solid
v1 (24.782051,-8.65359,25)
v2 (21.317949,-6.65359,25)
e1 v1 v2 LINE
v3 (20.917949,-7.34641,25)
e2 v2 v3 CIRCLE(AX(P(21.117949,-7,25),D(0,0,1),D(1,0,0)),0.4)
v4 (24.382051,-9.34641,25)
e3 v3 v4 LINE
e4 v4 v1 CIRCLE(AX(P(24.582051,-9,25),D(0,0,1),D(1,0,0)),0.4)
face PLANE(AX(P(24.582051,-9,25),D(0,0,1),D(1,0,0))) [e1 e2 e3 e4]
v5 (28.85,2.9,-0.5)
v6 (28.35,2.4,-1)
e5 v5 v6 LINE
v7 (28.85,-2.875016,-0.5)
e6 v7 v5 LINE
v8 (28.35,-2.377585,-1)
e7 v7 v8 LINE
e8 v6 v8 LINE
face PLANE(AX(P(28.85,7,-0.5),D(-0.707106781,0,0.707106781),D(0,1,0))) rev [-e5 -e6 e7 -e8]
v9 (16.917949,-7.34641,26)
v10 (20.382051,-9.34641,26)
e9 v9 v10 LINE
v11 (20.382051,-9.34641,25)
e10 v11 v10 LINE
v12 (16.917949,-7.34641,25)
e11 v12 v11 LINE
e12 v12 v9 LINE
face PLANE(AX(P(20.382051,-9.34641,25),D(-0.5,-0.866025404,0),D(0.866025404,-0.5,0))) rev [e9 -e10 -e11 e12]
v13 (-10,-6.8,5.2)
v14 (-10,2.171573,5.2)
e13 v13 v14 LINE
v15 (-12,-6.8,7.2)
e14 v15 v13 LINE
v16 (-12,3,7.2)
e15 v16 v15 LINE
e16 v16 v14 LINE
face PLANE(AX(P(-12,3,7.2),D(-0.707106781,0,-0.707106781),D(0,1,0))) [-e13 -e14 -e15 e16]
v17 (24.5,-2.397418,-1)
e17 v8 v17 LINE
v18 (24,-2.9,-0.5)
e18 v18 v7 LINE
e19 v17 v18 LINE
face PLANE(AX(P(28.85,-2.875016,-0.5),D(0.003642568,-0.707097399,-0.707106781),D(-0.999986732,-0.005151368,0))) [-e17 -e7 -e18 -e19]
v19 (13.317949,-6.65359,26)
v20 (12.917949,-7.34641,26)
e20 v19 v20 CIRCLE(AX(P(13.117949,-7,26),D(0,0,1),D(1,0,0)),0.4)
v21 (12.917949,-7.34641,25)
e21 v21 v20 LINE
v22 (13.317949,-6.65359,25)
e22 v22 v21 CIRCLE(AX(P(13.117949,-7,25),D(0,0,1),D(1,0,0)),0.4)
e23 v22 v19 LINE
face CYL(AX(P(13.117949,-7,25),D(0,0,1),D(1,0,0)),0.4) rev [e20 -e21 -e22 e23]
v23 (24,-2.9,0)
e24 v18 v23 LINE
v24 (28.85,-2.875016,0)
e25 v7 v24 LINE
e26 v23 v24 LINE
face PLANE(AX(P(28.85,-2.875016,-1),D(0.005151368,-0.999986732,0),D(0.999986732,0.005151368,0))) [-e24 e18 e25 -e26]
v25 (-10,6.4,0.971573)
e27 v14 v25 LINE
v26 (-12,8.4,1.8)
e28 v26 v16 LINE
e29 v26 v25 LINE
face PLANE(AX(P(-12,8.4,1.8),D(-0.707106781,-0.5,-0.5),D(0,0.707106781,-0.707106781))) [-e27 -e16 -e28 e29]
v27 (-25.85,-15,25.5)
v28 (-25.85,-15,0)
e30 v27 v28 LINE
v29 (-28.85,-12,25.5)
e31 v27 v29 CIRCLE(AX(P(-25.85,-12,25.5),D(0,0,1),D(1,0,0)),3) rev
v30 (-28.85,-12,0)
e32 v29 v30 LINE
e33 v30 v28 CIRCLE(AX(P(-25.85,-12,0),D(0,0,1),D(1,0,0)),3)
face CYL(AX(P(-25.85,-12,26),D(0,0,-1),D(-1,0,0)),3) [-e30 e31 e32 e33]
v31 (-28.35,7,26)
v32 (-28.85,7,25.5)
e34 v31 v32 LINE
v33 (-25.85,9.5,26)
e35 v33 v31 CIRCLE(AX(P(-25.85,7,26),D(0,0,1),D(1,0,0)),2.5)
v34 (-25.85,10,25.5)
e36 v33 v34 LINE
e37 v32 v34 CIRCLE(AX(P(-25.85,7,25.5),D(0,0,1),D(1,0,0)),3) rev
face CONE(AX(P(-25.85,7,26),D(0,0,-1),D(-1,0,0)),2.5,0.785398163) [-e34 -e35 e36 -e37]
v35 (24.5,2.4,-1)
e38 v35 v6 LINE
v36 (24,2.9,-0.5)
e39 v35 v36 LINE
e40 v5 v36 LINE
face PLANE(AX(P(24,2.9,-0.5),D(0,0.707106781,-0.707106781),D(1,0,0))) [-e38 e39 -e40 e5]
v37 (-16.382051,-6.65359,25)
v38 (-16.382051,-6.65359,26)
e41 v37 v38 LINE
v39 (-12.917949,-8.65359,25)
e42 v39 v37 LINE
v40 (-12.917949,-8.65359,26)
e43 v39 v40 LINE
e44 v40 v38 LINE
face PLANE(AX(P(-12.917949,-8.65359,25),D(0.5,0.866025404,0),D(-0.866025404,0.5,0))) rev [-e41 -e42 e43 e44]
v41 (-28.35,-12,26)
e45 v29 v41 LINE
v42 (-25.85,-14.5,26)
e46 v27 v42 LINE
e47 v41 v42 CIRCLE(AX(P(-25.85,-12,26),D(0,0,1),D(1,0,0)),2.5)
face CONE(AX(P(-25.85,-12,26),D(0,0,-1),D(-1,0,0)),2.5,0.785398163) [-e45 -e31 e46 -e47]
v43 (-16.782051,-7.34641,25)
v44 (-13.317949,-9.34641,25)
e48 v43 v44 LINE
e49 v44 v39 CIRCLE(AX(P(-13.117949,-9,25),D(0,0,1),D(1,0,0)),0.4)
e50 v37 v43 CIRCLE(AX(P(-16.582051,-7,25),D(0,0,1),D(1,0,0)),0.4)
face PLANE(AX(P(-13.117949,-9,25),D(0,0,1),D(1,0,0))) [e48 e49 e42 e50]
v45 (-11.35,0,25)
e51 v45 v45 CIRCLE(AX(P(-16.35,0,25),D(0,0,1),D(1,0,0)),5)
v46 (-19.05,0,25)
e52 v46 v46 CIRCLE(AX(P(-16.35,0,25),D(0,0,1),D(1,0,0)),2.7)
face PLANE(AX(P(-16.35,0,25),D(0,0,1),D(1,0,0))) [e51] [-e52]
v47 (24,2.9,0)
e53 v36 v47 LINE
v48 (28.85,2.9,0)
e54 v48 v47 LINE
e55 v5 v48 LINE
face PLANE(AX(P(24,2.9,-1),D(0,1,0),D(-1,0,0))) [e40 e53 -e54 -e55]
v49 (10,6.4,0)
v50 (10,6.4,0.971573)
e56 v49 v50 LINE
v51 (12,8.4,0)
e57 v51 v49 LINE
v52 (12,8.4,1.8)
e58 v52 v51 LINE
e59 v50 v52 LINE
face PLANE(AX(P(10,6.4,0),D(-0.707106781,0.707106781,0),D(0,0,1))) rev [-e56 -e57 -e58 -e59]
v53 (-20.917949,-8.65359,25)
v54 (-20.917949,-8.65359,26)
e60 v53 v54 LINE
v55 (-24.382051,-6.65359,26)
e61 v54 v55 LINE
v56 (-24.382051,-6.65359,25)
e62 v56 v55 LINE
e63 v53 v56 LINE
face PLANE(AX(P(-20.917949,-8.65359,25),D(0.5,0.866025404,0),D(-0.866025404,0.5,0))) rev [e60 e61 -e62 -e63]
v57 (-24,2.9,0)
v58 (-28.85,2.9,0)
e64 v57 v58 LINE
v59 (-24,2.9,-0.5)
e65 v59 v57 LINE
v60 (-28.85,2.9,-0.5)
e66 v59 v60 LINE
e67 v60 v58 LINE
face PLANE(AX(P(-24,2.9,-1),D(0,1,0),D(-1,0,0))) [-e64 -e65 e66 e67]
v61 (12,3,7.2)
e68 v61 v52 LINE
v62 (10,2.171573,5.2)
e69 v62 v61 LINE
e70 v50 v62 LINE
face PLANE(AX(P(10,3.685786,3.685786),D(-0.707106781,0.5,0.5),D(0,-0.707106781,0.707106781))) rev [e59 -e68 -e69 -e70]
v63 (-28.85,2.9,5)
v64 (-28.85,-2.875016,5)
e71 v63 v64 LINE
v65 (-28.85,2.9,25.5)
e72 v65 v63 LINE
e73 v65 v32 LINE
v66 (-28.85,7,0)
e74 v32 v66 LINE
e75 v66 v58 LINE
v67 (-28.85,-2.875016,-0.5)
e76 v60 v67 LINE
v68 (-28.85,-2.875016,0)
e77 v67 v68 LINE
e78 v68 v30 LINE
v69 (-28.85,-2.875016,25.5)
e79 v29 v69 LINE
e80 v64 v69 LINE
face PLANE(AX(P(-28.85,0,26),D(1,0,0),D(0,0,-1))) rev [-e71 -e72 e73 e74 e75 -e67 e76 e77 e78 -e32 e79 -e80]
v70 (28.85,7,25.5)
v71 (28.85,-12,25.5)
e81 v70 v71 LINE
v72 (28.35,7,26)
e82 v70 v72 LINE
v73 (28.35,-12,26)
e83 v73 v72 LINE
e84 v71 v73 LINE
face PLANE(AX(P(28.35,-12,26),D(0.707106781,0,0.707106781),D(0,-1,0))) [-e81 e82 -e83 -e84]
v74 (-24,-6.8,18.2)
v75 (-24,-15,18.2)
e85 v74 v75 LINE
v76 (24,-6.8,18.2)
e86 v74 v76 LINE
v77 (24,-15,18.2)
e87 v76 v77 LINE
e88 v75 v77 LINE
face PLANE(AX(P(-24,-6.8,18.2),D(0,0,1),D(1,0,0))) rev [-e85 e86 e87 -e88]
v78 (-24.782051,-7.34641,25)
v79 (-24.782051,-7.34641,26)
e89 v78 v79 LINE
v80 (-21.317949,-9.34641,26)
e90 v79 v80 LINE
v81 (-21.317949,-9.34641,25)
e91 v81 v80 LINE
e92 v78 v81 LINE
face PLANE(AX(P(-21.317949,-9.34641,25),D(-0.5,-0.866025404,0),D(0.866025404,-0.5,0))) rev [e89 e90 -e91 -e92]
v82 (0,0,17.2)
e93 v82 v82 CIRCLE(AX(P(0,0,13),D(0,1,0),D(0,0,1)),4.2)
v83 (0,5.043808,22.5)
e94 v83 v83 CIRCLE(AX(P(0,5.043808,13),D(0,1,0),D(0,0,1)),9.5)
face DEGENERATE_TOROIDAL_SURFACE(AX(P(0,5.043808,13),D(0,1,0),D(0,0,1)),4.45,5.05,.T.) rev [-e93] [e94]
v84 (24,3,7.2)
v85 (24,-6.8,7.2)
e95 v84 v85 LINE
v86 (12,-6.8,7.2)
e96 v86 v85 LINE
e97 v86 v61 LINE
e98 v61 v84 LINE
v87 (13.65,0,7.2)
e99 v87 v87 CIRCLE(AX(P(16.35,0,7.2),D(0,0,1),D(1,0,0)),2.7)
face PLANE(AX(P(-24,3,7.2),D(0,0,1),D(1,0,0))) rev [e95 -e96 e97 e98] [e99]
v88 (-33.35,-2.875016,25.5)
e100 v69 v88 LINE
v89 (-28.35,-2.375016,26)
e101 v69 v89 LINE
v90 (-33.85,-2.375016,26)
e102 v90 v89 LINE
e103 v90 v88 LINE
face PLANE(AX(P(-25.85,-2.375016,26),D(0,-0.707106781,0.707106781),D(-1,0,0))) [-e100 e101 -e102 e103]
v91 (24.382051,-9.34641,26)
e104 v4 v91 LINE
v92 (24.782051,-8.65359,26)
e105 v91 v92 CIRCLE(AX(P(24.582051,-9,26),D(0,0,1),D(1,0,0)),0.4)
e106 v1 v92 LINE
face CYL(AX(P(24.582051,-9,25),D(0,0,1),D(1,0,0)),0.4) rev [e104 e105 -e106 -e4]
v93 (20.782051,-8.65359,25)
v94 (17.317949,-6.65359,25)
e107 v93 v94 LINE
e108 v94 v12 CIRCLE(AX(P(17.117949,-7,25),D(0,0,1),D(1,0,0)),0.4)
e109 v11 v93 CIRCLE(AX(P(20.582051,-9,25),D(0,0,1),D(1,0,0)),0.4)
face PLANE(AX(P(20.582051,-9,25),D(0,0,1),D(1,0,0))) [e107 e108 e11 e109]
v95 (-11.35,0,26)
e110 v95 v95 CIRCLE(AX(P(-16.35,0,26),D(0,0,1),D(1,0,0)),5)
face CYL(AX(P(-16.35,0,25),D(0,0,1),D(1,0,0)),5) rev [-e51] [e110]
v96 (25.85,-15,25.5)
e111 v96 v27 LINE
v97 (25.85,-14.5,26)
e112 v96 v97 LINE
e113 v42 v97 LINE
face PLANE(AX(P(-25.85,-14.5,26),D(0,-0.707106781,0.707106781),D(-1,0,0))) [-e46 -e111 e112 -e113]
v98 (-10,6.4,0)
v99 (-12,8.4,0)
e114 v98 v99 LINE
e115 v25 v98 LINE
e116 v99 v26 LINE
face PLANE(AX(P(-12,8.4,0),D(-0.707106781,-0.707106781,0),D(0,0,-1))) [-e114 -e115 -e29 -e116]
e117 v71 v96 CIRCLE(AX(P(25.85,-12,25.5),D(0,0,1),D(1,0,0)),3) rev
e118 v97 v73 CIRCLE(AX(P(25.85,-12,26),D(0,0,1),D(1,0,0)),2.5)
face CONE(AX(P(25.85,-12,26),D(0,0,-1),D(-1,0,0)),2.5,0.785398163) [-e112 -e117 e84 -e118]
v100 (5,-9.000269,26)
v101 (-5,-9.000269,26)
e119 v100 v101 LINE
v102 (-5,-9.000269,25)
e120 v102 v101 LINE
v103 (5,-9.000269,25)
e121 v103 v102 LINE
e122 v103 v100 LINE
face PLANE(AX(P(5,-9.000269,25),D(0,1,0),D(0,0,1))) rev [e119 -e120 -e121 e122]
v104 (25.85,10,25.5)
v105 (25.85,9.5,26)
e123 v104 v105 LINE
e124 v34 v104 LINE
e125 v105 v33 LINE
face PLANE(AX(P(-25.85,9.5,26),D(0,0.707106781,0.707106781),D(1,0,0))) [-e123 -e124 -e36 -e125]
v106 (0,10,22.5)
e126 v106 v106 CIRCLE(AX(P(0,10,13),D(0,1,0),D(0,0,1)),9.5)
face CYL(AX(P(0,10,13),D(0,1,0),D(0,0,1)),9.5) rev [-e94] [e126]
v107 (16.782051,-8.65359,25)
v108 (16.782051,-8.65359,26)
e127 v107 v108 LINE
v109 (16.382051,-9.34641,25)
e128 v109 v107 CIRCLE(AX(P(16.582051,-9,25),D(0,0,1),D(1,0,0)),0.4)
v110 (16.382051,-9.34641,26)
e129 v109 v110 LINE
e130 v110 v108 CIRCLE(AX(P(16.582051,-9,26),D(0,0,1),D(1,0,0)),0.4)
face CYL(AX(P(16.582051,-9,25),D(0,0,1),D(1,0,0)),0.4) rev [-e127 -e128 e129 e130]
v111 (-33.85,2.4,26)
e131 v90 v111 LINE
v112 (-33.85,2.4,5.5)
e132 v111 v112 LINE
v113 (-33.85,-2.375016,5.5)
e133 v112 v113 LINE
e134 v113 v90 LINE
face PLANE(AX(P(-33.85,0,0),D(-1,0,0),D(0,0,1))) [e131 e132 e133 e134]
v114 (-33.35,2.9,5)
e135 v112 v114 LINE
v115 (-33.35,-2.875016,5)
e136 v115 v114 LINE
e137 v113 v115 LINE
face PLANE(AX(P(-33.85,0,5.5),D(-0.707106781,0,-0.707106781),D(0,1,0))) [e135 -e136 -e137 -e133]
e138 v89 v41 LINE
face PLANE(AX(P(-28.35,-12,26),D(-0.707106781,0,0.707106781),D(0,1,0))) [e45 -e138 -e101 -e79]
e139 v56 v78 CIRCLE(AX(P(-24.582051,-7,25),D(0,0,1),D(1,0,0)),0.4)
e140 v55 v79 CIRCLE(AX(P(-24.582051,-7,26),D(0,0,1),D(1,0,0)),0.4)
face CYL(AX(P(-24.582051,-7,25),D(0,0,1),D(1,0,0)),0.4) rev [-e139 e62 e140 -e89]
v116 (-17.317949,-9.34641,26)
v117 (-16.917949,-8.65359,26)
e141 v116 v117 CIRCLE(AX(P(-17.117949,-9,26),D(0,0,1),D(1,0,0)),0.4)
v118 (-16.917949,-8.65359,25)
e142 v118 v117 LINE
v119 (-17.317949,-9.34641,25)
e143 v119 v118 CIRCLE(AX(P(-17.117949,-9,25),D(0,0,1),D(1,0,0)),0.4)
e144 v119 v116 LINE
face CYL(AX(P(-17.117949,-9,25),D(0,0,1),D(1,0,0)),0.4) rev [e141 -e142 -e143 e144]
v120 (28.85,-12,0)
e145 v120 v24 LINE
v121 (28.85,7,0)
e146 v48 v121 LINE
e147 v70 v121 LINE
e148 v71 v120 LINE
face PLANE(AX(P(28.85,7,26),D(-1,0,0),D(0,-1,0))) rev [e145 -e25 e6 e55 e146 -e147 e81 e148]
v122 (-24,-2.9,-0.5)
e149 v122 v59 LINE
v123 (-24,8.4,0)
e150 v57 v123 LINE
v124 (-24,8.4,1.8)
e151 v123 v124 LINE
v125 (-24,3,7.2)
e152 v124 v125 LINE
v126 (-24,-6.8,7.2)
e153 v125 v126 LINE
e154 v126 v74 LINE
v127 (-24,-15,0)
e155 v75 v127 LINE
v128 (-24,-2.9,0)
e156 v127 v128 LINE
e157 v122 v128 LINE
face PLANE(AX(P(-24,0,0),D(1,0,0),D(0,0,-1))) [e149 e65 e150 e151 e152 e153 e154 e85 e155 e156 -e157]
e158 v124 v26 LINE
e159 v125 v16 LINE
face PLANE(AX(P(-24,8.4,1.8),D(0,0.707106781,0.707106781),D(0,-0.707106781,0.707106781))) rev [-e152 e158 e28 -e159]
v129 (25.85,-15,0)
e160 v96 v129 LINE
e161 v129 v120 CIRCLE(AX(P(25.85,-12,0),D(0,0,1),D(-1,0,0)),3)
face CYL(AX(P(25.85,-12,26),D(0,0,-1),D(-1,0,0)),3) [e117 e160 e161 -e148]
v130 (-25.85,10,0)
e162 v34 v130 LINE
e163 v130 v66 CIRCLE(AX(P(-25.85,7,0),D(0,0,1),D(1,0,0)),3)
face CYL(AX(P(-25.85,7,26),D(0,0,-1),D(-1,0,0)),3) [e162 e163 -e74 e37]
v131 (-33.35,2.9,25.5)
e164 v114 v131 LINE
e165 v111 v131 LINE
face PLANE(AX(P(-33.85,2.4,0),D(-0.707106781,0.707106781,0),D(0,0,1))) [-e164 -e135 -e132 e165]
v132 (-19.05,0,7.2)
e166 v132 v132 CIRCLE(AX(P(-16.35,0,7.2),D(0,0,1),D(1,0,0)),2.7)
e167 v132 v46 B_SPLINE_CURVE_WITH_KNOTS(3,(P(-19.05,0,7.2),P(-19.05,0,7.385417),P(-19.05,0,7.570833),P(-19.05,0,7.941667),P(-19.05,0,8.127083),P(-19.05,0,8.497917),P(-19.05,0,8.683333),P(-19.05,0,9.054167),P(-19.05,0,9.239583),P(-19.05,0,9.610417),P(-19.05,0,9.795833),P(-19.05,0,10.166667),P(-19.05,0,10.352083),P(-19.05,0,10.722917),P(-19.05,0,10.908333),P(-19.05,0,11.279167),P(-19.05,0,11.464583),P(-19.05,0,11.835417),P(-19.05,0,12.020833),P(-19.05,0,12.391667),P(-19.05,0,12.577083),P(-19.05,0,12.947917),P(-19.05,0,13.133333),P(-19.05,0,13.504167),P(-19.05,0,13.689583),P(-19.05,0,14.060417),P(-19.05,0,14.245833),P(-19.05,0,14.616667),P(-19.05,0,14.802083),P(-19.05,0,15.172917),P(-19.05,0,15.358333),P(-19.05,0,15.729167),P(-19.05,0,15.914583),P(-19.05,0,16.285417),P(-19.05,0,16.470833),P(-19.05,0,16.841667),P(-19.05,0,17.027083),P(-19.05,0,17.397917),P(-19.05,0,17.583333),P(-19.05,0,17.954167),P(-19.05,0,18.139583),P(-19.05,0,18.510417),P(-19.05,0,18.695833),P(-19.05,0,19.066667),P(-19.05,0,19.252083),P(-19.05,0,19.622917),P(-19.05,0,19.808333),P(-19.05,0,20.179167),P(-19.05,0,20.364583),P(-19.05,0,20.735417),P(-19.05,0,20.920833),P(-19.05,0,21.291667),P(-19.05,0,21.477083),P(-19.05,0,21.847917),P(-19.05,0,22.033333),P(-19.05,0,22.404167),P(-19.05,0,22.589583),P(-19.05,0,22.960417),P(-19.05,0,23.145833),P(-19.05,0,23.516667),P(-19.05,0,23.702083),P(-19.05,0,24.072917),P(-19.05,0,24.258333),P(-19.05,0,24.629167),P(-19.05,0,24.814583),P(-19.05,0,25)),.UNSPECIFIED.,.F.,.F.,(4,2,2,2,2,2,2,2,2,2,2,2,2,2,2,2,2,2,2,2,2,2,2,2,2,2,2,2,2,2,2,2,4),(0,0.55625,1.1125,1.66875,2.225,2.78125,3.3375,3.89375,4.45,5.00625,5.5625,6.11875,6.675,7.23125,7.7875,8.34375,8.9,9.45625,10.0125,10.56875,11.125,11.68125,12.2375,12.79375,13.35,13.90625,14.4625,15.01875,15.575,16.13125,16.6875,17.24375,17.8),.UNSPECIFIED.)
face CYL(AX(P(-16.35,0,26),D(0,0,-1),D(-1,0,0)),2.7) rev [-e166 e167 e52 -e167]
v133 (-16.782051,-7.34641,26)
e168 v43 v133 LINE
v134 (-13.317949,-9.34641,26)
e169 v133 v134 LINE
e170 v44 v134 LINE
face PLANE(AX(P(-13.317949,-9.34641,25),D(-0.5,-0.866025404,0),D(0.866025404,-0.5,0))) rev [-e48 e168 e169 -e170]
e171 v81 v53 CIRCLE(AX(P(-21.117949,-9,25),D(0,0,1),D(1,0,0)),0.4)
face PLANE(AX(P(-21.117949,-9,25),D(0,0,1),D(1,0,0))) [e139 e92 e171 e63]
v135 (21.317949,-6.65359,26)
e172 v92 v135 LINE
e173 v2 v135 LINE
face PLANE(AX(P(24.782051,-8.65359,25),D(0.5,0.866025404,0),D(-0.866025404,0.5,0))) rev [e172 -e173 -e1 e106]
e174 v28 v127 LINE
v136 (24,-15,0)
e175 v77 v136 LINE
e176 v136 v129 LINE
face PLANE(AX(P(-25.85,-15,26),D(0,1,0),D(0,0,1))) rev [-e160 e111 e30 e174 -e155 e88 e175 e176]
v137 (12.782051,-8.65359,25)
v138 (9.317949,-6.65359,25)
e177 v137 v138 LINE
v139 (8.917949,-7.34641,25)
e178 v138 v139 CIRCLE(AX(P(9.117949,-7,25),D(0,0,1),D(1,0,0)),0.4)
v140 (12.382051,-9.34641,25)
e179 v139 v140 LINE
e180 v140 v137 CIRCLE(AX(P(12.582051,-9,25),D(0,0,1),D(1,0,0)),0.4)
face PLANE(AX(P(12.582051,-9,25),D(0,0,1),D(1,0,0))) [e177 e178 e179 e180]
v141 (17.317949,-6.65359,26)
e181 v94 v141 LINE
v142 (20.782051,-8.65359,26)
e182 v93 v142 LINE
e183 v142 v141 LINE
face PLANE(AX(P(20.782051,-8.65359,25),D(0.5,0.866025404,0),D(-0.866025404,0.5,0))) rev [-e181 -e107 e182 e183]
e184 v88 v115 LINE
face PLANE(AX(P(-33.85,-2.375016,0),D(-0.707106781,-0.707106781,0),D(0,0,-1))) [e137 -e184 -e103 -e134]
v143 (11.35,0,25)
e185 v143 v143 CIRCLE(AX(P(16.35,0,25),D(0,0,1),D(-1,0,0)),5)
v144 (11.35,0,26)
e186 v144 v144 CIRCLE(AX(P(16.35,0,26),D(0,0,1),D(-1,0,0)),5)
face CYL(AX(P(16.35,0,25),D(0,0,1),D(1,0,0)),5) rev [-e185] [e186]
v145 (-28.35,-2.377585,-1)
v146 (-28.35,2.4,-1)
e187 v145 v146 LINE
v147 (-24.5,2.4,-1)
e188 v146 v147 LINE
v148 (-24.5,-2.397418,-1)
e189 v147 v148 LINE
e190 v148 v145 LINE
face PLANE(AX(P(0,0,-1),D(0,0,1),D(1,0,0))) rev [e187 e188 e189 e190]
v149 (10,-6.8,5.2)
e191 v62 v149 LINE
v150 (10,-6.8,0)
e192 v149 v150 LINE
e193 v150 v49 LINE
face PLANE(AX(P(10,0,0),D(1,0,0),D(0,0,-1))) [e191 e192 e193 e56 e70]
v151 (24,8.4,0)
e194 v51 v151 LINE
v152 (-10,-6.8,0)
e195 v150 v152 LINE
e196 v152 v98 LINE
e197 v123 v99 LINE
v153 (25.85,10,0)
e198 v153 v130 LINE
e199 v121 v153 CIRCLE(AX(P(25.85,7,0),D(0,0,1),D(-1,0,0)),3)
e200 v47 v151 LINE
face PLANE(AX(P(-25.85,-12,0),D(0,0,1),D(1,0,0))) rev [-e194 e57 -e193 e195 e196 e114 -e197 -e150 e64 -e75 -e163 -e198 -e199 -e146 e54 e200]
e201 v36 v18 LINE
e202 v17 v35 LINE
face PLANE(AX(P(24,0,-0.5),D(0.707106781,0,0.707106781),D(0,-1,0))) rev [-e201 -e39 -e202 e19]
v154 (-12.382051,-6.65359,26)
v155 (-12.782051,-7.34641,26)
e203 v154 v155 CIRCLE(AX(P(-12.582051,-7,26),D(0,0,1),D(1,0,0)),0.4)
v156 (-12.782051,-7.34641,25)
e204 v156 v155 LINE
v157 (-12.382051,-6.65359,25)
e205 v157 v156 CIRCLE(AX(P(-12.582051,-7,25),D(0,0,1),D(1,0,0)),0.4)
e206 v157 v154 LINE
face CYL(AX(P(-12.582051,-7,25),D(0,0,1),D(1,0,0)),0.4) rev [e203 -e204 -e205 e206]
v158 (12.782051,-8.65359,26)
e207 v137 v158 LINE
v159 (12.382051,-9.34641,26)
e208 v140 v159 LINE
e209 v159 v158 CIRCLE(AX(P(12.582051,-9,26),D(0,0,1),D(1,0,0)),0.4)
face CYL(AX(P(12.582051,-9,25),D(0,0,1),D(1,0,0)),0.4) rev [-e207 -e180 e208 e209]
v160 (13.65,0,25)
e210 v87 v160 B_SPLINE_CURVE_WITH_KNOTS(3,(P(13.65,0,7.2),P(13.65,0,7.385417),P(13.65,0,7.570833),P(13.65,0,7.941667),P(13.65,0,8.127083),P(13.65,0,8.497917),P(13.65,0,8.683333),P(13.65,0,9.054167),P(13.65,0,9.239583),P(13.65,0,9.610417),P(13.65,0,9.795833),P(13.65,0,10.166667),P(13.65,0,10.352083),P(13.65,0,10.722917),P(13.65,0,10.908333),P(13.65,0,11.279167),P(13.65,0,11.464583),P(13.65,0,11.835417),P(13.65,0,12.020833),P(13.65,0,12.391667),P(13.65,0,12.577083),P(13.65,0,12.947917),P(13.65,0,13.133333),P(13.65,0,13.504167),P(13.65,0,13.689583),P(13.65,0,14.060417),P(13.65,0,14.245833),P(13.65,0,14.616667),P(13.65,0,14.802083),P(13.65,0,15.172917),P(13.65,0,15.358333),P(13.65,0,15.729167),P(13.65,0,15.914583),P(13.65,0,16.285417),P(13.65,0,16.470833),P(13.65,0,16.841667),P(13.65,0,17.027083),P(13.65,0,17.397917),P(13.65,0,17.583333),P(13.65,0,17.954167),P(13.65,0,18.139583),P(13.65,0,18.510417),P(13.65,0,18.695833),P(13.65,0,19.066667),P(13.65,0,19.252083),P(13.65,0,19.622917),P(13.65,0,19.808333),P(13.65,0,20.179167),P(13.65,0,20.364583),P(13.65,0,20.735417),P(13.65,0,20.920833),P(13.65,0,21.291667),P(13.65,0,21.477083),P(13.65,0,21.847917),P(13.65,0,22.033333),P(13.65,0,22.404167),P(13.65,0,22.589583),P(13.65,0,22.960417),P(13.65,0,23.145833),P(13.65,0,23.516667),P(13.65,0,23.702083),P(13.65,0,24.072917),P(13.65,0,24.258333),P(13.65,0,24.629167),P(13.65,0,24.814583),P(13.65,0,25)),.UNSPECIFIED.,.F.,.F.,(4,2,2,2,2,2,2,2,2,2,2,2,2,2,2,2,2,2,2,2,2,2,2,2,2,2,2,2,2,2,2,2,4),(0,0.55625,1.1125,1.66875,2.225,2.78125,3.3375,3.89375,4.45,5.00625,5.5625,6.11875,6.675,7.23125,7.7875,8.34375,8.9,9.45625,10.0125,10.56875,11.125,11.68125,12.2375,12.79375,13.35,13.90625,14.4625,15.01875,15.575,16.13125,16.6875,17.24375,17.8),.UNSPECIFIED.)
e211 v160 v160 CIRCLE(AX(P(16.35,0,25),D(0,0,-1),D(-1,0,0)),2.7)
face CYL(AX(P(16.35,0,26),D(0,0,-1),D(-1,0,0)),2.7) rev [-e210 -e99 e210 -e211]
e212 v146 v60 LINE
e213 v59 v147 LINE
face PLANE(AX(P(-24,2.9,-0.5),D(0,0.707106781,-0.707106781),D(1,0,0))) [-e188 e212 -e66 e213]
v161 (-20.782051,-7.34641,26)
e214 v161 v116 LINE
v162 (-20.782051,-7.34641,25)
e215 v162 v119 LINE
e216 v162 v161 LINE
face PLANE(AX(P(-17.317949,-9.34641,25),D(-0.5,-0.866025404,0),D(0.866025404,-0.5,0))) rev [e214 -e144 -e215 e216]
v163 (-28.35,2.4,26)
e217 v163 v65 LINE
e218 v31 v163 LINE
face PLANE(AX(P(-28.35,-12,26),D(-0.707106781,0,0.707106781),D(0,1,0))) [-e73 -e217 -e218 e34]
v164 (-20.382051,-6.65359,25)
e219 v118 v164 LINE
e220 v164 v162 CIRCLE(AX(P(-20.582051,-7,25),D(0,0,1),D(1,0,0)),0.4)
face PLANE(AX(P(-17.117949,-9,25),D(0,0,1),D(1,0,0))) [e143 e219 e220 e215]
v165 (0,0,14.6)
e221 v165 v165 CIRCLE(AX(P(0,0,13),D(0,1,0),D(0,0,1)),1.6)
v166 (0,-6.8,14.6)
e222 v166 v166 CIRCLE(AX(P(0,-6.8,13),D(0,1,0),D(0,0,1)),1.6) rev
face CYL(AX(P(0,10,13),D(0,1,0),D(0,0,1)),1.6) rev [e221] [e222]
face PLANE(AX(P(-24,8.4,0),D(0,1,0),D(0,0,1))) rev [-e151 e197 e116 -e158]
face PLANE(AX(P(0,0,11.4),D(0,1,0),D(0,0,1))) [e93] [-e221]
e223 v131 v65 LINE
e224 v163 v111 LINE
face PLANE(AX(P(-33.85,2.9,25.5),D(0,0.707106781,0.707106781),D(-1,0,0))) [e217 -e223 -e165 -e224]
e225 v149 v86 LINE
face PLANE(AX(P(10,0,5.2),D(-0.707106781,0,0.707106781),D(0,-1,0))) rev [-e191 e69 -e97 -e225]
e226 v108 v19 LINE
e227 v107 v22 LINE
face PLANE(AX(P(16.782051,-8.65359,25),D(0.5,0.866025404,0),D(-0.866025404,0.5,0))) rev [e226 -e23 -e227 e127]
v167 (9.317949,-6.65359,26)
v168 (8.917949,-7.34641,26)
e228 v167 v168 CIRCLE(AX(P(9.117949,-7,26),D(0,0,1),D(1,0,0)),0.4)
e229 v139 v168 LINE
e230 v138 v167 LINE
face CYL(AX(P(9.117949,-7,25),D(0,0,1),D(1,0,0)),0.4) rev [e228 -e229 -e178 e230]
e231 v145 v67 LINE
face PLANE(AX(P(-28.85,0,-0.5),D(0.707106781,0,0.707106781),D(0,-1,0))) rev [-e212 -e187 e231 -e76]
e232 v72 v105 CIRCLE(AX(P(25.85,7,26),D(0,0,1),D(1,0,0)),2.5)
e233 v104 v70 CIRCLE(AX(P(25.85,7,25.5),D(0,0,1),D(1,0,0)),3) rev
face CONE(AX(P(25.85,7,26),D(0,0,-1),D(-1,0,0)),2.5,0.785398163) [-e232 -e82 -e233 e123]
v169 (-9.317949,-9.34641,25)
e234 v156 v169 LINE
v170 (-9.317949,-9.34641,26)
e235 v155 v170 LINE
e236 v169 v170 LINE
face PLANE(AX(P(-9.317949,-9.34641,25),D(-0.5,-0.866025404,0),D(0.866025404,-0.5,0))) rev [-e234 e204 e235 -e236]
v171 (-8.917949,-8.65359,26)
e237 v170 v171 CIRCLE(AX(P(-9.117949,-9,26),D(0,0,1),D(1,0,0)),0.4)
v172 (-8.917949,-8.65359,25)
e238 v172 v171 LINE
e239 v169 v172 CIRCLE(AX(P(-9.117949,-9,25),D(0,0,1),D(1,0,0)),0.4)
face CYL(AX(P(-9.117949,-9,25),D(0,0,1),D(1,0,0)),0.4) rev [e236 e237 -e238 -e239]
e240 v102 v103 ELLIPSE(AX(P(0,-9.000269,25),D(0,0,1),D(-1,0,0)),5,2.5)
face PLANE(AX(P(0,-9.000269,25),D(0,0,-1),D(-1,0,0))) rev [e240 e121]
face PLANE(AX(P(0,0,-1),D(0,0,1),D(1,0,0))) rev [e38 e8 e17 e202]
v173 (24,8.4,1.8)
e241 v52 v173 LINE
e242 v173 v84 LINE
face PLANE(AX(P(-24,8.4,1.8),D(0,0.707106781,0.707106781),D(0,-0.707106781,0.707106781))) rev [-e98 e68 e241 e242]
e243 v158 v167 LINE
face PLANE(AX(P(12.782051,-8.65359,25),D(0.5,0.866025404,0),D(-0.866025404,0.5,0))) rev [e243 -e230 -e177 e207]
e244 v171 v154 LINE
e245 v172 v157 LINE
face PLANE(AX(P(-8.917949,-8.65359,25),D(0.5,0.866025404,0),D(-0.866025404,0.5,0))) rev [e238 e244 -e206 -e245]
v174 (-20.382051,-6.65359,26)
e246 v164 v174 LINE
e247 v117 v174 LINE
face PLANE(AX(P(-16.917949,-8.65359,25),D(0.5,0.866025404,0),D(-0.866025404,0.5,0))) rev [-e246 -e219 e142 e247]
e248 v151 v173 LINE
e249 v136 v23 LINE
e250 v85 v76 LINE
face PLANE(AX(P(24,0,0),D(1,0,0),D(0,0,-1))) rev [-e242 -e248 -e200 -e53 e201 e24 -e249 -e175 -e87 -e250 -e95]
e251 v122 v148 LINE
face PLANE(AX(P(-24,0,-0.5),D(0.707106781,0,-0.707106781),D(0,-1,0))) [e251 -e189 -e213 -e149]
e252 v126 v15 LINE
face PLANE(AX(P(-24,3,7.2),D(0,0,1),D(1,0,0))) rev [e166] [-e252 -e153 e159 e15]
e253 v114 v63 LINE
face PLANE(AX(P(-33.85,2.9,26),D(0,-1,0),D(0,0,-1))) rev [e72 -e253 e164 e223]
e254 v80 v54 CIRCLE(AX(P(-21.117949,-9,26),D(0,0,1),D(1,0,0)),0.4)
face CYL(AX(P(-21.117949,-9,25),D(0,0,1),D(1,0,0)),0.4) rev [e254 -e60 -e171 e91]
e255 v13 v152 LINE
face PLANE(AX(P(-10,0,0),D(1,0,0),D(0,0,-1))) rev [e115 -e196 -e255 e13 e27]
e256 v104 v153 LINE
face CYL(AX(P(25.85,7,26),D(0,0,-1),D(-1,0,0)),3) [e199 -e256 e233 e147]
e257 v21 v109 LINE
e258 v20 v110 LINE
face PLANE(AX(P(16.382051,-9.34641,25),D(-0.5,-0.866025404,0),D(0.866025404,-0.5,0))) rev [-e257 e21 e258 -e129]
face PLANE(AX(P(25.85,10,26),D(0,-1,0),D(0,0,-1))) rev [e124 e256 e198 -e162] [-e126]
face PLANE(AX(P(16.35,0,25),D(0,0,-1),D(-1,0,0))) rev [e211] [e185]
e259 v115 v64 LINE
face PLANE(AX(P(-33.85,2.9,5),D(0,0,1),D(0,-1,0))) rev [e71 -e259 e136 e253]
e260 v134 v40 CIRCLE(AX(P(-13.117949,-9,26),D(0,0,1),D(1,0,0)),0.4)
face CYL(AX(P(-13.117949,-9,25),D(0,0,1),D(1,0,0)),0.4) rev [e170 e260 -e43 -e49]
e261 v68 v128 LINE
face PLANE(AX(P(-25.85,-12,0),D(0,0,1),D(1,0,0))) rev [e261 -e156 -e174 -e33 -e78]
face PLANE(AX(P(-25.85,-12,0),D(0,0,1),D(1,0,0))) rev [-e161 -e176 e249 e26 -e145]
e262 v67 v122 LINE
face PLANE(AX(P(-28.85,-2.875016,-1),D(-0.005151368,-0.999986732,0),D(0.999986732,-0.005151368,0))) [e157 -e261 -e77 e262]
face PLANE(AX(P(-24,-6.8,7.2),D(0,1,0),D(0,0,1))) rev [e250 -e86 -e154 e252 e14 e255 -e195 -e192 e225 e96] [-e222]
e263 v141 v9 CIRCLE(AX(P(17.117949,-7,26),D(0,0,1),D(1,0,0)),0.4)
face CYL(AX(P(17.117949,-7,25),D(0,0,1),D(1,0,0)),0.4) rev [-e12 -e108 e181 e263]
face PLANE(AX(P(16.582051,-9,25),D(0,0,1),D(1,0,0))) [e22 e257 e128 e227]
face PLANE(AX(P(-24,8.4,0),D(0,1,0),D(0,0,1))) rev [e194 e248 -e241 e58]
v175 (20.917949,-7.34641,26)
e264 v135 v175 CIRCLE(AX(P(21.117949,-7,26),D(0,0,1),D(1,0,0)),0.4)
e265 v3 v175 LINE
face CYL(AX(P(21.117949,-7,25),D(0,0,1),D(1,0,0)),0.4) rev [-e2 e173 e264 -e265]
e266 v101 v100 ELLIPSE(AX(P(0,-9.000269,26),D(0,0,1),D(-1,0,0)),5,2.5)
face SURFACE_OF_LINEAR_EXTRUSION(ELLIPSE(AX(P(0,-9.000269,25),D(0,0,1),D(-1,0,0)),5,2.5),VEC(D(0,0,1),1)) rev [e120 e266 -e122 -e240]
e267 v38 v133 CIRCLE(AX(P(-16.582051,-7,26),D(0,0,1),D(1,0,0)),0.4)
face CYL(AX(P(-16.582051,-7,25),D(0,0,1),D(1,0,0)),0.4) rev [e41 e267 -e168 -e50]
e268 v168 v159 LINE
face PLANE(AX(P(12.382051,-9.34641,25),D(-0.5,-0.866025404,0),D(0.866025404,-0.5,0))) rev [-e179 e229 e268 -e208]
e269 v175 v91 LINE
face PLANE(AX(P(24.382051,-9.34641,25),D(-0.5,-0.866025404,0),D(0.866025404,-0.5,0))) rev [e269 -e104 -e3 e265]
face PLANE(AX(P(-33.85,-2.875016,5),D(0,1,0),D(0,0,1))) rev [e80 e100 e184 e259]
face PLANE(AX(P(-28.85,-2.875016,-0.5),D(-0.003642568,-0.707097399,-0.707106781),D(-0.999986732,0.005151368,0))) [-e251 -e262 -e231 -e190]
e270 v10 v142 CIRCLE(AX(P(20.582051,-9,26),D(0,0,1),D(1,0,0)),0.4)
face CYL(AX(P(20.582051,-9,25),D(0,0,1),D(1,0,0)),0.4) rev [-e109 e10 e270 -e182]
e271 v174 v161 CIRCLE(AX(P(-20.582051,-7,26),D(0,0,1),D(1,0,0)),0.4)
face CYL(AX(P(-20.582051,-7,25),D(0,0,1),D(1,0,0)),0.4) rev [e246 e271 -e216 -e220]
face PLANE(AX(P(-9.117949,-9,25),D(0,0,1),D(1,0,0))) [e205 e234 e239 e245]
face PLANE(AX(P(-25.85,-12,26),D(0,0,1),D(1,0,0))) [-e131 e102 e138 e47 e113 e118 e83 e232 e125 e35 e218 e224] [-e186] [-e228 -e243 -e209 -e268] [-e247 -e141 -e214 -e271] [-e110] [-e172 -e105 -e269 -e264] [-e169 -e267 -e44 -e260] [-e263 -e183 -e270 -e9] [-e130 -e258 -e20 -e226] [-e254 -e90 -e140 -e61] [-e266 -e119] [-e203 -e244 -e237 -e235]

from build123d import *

# Parameters (mm, degrees)
SKETCH_3_R          = 2.7
EXTRUDE_2_DEPTH     = 26
SKETCH_5_R          = 5
CUT_EXTRUDE_1_DEPTH = 1
CUT_EXTRUDE_2_DEPTH = 1
CUT_EXTRUDE_3_DEPTH = 24
EXTRUDE_3_DEPTH     = 1
CHAMFER_1_SIZE      = 0.5
SKETCH_9_W          = 21
SKETCH_9_H          = 5.775015532
EXTRUDE_4_DEPTH     = 5
CHAMFER_3_SIZE      = 0.5
EXTRUDE_5_DEPTH     = 10
CHAMFER_4_SIZE      = 2


with BuildPart() as part:
    # 草图3 → 凸台-拉伸2 (new body)
    with BuildSketch(Plane.XY):
        with BuildLine():
            Line((25.85, 10), (-25.85, 10))
            ThreePointArc((-25.85, 10), (-27.971320344, 9.121320344), (-28.85, 7))
            Line((-28.85, 7), (-28.85, 0))
            Line((-28.85, 0), (-28.85, -12))
            ThreePointArc((-28.85, -12), (-27.971320344, -14.121320344), (-25.85, -15))
            Line((-25.85, -15), (25.85, -15))
            ThreePointArc((25.85, -15), (27.971320344, -14.121320344), (28.85, -12))
            Line((28.85, -12), (28.85, 0))
            Line((28.85, 0), (28.85, 7))
            ThreePointArc((28.85, 7), (27.971320344, 9.121320344), (25.85, 10))
        make_face()
        with Locations((-16.35, 0)):
            Circle(SKETCH_3_R, mode=Mode.SUBTRACT)
        with Locations((16.35, 0)):
            Circle(SKETCH_3_R, mode=Mode.SUBTRACT)
    extrude(amount=EXTRUDE_2_DEPTH)

    # 草图5 → 切除-拉伸1 (cut)
    with BuildSketch(Plane.XY.offset(26)):
        with Locations((-16.35, 0)):
            Circle(SKETCH_5_R)
        with Locations((16.35, 0)):
            Circle(SKETCH_5_R)
    extrude(amount=-CUT_EXTRUDE_1_DEPTH, mode=Mode.SUBTRACT)

    # 草图6 → 切除-拉伸2 (cut)
    with BuildSketch(Plane.XY.offset(26)):
        with BuildLine():
            Line((5, -9.000269215), (-5, -9.000269215))
            add(Edge.make_bspline(
                [(-5, -9.000269215), (-5, -11.500269215), (0, -11.500269215), (5, -11.500269215), (5, -9.000269215)],
                knots=[3.141592654, 3.141592654, 3.141592654, 4.71238898, 4.71238898, 6.283185307, 6.283185307, 6.283185307], degree=2, weights=[1, 0.707106781, 1, 0.707106781, 1]))
        make_face()
        with BuildLine():
            Line((-21.317949192, -9.346410161), (-24.782050808, -7.346410161))
            ThreePointArc((-24.782050808, -7.346410161), (-24.928460969, -6.8), (-24.382050808, -6.653589838))
            Line((-24.382050808, -6.653589838), (-20.917949192, -8.653589838))
            ThreePointArc((-20.917949192, -8.653589838), (-20.771539031, -9.2), (-21.317949192, -9.346410161))
        make_face()
        with BuildLine():
            Line((-17.317949192, -9.346410161), (-20.782050808, -7.346410161))
            ThreePointArc((-20.782050808, -7.346410161), (-20.928460969, -6.8), (-20.382050808, -6.653589838))
            Line((-20.382050808, -6.653589838), (-16.917949192, -8.653589838))
            ThreePointArc((-16.917949192, -8.653589838), (-16.771539031, -9.2), (-17.317949192, -9.346410161))
        make_face()
        with BuildLine():
            Line((-13.317949192, -9.346410161), (-16.782050808, -7.346410161))
            ThreePointArc((-16.782050808, -7.346410161), (-16.928460969, -6.8), (-16.382050808, -6.653589838))
            Line((-16.382050808, -6.653589838), (-12.917949192, -8.653589838))
            ThreePointArc((-12.917949192, -8.653589838), (-12.771539031, -9.2), (-13.317949192, -9.346410161))
        make_face()
        with BuildLine():
            Line((-9.317949192, -9.346410161), (-12.782050808, -7.346410161))
            ThreePointArc((-12.782050808, -7.346410161), (-12.928460969, -6.8), (-12.382050808, -6.653589838))
            Line((-12.382050808, -6.653589838), (-8.917949192, -8.653589838))
            ThreePointArc((-8.917949192, -8.653589838), (-8.771539031, -9.2), (-9.317949192, -9.346410161))
        make_face()
        with BuildLine():
            Line((12.382050808, -9.346410161), (8.917949192, -7.346410161))
            ThreePointArc((8.917949192, -7.346410161), (8.771539031, -6.8), (9.317949192, -6.653589838))
            Line((9.317949192, -6.653589838), (12.782050808, -8.653589838))
            ThreePointArc((12.782050808, -8.653589838), (12.928460969, -9.2), (12.382050808, -9.346410161))
        make_face()
        with BuildLine():
            Line((16.382050808, -9.346410161), (12.917949192, -7.346410161))
            ThreePointArc((12.917949192, -7.346410161), (12.771539031, -6.8), (13.317949192, -6.653589838))
            Line((13.317949192, -6.653589838), (16.782050808, -8.653589838))
            ThreePointArc((16.782050808, -8.653589838), (16.928460969, -9.2), (16.382050808, -9.346410161))
        make_face()
        with BuildLine():
            Line((20.382050808, -9.346410161), (16.917949192, -7.346410161))
            ThreePointArc((16.917949192, -7.346410161), (16.771539031, -6.8), (17.317949192, -6.653589838))
            Line((17.317949192, -6.653589838), (20.782050808, -8.653589838))
            ThreePointArc((20.782050808, -8.653589838), (20.928460969, -9.2), (20.382050808, -9.346410161))
        make_face()
        with BuildLine():
            Line((24.382050808, -9.346410161), (20.917949192, -7.346410161))
            ThreePointArc((20.917949192, -7.346410161), (20.771539031, -6.8), (21.317949192, -6.653589838))
            Line((21.317949192, -6.653589838), (24.782050808, -8.653589838))
            ThreePointArc((24.782050808, -8.653589838), (24.928460969, -9.2), (24.382050808, -9.346410161))
        make_face()
    extrude(amount=-CUT_EXTRUDE_2_DEPTH, mode=Mode.SUBTRACT)

    # 草图7 → 切除-拉伸3 (cut, symmetric)
    with BuildSketch(Plane(origin=(0, 0, 0), x_dir=(0, 0, -1), z_dir=(1, 0, 0))):
        Polygon((0, 8.4), (-1.8, 8.4), (-7.2, 3), (-7.2, -6.8), (-18.2, -6.8), (-18.2, -15), (0, -15), align=None)
    extrude(amount=CUT_EXTRUDE_3_DEPTH, both=True, mode=Mode.SUBTRACT)

    # 草图8 → 凸台-拉伸3 (add)
    with BuildSketch(Plane.XY):
        Polygon((-24, 2.9), (-28.85, 2.9), (-28.85, -2.875015532), (-24, -2.9), align=None)
        Polygon((28.85, -2.875015532), (24, -2.9), (24, 2.9), (28.85, 2.9), align=None)
    extrude(amount=-EXTRUDE_3_DEPTH)

    # 倒角1
    chamfer_1_edges = [part.edges().sort_by_distance(p)[0] for p in [
        (-26.425, 2.9, -1),
        (-28.85, 0.012492234, -1),
        (-26.425, -2.887507766, -1),
        (-24, 0, -1),
        (26.425, 2.9, -1),
        (24, 0, -1),
        (26.425, -2.887507766, -1),
        (28.85, 0.012492234, -1),
    ]]
    chamfer(chamfer_1_edges, length=CHAMFER_1_SIZE)

    # 草图9 → 凸台-拉伸4 (add)
    with BuildSketch(Plane.ZY.offset(28.85)):
        with Locations((15.5, 0.012492234)):
            Rectangle(SKETCH_9_W, SKETCH_9_H)
    extrude(amount=EXTRUDE_4_DEPTH)

    # 倒角3
    chamfer_3_edges = [part.edges().sort_by_distance(p)[0] for p in [
        (-31.35, -2.875015532, 26),
        (-33.85, -2.875015532, 15.5),
        (-33.85, 0.012492234, 5),
        (-33.85, 2.9, 15.5),
        (-31.35, 2.9, 26),
        (-28.85, -7.437507766, 26),
        (-27.971320344, -14.121320344, 26),
        (0, -15, 26),
        (27.971320344, -14.121320344, 26),
        (28.85, -2.5, 26),
        (-28.85, 4.95, 26),
        (27.971320344, 9.121320344, 26),
        (-27.971320344, 9.121320344, 26),
        (0, 10, 26),
    ]]
    chamfer(chamfer_3_edges, length=CHAMFER_3_SIZE)

    # 草图10 → 凸台-拉伸5 (add, symmetric)
    with BuildSketch(Plane(origin=(0, 0, 0), x_dir=(0, 0, -1), z_dir=(1, 0, 0))):
        Polygon((-7.2, -6.8), (0, -6.8), (0, 8.4), (-1.8, 8.4), (-7.2, 3), align=None)
    extrude(amount=EXTRUDE_5_DEPTH, both=True)

    # 倒角4
    chamfer_4_edges = [part.edges().sort_by_distance(p)[0] for p in [
        (-10, -1.9, 7.2),
        (-10, 5.7, 4.5),
        (-10, 8.4, 0.9),
        (10, -1.9, 7.2),
        (10, 8.4, 0.9),
        (10, 5.7, 4.5),
    ]]
    chamfer(chamfer_4_edges, length=CHAMFER_4_SIZE)

    # 草图4 → 切除-旋转1 (revolve, cut)
    with BuildSketch(Plane(origin=(0, 0, 0), x_dir=(0, 0, -1), z_dir=(1, 0, 0))):
        with BuildLine():
            Line((-13, 10), (-13, -15))
            Line((-13, -15), (-11.4, -15))
            Line((-11.4, -15), (-11.4, 0))
            Line((-11.4, 0), (-8.8, 0))
            ThreePointArc((-8.8, 0), (-5.068620963, 1.38559814), (-3.5, 5.043808085))
            Line((-3.5, 5.043808085), (-3.5, 10))
            Line((-3.5, 10), (-13, 10))
        make_face()
    revolve(axis=Axis((0, 10, 13), (0, -1, 0)), mode=Mode.SUBTRACT)


solid = part.part
